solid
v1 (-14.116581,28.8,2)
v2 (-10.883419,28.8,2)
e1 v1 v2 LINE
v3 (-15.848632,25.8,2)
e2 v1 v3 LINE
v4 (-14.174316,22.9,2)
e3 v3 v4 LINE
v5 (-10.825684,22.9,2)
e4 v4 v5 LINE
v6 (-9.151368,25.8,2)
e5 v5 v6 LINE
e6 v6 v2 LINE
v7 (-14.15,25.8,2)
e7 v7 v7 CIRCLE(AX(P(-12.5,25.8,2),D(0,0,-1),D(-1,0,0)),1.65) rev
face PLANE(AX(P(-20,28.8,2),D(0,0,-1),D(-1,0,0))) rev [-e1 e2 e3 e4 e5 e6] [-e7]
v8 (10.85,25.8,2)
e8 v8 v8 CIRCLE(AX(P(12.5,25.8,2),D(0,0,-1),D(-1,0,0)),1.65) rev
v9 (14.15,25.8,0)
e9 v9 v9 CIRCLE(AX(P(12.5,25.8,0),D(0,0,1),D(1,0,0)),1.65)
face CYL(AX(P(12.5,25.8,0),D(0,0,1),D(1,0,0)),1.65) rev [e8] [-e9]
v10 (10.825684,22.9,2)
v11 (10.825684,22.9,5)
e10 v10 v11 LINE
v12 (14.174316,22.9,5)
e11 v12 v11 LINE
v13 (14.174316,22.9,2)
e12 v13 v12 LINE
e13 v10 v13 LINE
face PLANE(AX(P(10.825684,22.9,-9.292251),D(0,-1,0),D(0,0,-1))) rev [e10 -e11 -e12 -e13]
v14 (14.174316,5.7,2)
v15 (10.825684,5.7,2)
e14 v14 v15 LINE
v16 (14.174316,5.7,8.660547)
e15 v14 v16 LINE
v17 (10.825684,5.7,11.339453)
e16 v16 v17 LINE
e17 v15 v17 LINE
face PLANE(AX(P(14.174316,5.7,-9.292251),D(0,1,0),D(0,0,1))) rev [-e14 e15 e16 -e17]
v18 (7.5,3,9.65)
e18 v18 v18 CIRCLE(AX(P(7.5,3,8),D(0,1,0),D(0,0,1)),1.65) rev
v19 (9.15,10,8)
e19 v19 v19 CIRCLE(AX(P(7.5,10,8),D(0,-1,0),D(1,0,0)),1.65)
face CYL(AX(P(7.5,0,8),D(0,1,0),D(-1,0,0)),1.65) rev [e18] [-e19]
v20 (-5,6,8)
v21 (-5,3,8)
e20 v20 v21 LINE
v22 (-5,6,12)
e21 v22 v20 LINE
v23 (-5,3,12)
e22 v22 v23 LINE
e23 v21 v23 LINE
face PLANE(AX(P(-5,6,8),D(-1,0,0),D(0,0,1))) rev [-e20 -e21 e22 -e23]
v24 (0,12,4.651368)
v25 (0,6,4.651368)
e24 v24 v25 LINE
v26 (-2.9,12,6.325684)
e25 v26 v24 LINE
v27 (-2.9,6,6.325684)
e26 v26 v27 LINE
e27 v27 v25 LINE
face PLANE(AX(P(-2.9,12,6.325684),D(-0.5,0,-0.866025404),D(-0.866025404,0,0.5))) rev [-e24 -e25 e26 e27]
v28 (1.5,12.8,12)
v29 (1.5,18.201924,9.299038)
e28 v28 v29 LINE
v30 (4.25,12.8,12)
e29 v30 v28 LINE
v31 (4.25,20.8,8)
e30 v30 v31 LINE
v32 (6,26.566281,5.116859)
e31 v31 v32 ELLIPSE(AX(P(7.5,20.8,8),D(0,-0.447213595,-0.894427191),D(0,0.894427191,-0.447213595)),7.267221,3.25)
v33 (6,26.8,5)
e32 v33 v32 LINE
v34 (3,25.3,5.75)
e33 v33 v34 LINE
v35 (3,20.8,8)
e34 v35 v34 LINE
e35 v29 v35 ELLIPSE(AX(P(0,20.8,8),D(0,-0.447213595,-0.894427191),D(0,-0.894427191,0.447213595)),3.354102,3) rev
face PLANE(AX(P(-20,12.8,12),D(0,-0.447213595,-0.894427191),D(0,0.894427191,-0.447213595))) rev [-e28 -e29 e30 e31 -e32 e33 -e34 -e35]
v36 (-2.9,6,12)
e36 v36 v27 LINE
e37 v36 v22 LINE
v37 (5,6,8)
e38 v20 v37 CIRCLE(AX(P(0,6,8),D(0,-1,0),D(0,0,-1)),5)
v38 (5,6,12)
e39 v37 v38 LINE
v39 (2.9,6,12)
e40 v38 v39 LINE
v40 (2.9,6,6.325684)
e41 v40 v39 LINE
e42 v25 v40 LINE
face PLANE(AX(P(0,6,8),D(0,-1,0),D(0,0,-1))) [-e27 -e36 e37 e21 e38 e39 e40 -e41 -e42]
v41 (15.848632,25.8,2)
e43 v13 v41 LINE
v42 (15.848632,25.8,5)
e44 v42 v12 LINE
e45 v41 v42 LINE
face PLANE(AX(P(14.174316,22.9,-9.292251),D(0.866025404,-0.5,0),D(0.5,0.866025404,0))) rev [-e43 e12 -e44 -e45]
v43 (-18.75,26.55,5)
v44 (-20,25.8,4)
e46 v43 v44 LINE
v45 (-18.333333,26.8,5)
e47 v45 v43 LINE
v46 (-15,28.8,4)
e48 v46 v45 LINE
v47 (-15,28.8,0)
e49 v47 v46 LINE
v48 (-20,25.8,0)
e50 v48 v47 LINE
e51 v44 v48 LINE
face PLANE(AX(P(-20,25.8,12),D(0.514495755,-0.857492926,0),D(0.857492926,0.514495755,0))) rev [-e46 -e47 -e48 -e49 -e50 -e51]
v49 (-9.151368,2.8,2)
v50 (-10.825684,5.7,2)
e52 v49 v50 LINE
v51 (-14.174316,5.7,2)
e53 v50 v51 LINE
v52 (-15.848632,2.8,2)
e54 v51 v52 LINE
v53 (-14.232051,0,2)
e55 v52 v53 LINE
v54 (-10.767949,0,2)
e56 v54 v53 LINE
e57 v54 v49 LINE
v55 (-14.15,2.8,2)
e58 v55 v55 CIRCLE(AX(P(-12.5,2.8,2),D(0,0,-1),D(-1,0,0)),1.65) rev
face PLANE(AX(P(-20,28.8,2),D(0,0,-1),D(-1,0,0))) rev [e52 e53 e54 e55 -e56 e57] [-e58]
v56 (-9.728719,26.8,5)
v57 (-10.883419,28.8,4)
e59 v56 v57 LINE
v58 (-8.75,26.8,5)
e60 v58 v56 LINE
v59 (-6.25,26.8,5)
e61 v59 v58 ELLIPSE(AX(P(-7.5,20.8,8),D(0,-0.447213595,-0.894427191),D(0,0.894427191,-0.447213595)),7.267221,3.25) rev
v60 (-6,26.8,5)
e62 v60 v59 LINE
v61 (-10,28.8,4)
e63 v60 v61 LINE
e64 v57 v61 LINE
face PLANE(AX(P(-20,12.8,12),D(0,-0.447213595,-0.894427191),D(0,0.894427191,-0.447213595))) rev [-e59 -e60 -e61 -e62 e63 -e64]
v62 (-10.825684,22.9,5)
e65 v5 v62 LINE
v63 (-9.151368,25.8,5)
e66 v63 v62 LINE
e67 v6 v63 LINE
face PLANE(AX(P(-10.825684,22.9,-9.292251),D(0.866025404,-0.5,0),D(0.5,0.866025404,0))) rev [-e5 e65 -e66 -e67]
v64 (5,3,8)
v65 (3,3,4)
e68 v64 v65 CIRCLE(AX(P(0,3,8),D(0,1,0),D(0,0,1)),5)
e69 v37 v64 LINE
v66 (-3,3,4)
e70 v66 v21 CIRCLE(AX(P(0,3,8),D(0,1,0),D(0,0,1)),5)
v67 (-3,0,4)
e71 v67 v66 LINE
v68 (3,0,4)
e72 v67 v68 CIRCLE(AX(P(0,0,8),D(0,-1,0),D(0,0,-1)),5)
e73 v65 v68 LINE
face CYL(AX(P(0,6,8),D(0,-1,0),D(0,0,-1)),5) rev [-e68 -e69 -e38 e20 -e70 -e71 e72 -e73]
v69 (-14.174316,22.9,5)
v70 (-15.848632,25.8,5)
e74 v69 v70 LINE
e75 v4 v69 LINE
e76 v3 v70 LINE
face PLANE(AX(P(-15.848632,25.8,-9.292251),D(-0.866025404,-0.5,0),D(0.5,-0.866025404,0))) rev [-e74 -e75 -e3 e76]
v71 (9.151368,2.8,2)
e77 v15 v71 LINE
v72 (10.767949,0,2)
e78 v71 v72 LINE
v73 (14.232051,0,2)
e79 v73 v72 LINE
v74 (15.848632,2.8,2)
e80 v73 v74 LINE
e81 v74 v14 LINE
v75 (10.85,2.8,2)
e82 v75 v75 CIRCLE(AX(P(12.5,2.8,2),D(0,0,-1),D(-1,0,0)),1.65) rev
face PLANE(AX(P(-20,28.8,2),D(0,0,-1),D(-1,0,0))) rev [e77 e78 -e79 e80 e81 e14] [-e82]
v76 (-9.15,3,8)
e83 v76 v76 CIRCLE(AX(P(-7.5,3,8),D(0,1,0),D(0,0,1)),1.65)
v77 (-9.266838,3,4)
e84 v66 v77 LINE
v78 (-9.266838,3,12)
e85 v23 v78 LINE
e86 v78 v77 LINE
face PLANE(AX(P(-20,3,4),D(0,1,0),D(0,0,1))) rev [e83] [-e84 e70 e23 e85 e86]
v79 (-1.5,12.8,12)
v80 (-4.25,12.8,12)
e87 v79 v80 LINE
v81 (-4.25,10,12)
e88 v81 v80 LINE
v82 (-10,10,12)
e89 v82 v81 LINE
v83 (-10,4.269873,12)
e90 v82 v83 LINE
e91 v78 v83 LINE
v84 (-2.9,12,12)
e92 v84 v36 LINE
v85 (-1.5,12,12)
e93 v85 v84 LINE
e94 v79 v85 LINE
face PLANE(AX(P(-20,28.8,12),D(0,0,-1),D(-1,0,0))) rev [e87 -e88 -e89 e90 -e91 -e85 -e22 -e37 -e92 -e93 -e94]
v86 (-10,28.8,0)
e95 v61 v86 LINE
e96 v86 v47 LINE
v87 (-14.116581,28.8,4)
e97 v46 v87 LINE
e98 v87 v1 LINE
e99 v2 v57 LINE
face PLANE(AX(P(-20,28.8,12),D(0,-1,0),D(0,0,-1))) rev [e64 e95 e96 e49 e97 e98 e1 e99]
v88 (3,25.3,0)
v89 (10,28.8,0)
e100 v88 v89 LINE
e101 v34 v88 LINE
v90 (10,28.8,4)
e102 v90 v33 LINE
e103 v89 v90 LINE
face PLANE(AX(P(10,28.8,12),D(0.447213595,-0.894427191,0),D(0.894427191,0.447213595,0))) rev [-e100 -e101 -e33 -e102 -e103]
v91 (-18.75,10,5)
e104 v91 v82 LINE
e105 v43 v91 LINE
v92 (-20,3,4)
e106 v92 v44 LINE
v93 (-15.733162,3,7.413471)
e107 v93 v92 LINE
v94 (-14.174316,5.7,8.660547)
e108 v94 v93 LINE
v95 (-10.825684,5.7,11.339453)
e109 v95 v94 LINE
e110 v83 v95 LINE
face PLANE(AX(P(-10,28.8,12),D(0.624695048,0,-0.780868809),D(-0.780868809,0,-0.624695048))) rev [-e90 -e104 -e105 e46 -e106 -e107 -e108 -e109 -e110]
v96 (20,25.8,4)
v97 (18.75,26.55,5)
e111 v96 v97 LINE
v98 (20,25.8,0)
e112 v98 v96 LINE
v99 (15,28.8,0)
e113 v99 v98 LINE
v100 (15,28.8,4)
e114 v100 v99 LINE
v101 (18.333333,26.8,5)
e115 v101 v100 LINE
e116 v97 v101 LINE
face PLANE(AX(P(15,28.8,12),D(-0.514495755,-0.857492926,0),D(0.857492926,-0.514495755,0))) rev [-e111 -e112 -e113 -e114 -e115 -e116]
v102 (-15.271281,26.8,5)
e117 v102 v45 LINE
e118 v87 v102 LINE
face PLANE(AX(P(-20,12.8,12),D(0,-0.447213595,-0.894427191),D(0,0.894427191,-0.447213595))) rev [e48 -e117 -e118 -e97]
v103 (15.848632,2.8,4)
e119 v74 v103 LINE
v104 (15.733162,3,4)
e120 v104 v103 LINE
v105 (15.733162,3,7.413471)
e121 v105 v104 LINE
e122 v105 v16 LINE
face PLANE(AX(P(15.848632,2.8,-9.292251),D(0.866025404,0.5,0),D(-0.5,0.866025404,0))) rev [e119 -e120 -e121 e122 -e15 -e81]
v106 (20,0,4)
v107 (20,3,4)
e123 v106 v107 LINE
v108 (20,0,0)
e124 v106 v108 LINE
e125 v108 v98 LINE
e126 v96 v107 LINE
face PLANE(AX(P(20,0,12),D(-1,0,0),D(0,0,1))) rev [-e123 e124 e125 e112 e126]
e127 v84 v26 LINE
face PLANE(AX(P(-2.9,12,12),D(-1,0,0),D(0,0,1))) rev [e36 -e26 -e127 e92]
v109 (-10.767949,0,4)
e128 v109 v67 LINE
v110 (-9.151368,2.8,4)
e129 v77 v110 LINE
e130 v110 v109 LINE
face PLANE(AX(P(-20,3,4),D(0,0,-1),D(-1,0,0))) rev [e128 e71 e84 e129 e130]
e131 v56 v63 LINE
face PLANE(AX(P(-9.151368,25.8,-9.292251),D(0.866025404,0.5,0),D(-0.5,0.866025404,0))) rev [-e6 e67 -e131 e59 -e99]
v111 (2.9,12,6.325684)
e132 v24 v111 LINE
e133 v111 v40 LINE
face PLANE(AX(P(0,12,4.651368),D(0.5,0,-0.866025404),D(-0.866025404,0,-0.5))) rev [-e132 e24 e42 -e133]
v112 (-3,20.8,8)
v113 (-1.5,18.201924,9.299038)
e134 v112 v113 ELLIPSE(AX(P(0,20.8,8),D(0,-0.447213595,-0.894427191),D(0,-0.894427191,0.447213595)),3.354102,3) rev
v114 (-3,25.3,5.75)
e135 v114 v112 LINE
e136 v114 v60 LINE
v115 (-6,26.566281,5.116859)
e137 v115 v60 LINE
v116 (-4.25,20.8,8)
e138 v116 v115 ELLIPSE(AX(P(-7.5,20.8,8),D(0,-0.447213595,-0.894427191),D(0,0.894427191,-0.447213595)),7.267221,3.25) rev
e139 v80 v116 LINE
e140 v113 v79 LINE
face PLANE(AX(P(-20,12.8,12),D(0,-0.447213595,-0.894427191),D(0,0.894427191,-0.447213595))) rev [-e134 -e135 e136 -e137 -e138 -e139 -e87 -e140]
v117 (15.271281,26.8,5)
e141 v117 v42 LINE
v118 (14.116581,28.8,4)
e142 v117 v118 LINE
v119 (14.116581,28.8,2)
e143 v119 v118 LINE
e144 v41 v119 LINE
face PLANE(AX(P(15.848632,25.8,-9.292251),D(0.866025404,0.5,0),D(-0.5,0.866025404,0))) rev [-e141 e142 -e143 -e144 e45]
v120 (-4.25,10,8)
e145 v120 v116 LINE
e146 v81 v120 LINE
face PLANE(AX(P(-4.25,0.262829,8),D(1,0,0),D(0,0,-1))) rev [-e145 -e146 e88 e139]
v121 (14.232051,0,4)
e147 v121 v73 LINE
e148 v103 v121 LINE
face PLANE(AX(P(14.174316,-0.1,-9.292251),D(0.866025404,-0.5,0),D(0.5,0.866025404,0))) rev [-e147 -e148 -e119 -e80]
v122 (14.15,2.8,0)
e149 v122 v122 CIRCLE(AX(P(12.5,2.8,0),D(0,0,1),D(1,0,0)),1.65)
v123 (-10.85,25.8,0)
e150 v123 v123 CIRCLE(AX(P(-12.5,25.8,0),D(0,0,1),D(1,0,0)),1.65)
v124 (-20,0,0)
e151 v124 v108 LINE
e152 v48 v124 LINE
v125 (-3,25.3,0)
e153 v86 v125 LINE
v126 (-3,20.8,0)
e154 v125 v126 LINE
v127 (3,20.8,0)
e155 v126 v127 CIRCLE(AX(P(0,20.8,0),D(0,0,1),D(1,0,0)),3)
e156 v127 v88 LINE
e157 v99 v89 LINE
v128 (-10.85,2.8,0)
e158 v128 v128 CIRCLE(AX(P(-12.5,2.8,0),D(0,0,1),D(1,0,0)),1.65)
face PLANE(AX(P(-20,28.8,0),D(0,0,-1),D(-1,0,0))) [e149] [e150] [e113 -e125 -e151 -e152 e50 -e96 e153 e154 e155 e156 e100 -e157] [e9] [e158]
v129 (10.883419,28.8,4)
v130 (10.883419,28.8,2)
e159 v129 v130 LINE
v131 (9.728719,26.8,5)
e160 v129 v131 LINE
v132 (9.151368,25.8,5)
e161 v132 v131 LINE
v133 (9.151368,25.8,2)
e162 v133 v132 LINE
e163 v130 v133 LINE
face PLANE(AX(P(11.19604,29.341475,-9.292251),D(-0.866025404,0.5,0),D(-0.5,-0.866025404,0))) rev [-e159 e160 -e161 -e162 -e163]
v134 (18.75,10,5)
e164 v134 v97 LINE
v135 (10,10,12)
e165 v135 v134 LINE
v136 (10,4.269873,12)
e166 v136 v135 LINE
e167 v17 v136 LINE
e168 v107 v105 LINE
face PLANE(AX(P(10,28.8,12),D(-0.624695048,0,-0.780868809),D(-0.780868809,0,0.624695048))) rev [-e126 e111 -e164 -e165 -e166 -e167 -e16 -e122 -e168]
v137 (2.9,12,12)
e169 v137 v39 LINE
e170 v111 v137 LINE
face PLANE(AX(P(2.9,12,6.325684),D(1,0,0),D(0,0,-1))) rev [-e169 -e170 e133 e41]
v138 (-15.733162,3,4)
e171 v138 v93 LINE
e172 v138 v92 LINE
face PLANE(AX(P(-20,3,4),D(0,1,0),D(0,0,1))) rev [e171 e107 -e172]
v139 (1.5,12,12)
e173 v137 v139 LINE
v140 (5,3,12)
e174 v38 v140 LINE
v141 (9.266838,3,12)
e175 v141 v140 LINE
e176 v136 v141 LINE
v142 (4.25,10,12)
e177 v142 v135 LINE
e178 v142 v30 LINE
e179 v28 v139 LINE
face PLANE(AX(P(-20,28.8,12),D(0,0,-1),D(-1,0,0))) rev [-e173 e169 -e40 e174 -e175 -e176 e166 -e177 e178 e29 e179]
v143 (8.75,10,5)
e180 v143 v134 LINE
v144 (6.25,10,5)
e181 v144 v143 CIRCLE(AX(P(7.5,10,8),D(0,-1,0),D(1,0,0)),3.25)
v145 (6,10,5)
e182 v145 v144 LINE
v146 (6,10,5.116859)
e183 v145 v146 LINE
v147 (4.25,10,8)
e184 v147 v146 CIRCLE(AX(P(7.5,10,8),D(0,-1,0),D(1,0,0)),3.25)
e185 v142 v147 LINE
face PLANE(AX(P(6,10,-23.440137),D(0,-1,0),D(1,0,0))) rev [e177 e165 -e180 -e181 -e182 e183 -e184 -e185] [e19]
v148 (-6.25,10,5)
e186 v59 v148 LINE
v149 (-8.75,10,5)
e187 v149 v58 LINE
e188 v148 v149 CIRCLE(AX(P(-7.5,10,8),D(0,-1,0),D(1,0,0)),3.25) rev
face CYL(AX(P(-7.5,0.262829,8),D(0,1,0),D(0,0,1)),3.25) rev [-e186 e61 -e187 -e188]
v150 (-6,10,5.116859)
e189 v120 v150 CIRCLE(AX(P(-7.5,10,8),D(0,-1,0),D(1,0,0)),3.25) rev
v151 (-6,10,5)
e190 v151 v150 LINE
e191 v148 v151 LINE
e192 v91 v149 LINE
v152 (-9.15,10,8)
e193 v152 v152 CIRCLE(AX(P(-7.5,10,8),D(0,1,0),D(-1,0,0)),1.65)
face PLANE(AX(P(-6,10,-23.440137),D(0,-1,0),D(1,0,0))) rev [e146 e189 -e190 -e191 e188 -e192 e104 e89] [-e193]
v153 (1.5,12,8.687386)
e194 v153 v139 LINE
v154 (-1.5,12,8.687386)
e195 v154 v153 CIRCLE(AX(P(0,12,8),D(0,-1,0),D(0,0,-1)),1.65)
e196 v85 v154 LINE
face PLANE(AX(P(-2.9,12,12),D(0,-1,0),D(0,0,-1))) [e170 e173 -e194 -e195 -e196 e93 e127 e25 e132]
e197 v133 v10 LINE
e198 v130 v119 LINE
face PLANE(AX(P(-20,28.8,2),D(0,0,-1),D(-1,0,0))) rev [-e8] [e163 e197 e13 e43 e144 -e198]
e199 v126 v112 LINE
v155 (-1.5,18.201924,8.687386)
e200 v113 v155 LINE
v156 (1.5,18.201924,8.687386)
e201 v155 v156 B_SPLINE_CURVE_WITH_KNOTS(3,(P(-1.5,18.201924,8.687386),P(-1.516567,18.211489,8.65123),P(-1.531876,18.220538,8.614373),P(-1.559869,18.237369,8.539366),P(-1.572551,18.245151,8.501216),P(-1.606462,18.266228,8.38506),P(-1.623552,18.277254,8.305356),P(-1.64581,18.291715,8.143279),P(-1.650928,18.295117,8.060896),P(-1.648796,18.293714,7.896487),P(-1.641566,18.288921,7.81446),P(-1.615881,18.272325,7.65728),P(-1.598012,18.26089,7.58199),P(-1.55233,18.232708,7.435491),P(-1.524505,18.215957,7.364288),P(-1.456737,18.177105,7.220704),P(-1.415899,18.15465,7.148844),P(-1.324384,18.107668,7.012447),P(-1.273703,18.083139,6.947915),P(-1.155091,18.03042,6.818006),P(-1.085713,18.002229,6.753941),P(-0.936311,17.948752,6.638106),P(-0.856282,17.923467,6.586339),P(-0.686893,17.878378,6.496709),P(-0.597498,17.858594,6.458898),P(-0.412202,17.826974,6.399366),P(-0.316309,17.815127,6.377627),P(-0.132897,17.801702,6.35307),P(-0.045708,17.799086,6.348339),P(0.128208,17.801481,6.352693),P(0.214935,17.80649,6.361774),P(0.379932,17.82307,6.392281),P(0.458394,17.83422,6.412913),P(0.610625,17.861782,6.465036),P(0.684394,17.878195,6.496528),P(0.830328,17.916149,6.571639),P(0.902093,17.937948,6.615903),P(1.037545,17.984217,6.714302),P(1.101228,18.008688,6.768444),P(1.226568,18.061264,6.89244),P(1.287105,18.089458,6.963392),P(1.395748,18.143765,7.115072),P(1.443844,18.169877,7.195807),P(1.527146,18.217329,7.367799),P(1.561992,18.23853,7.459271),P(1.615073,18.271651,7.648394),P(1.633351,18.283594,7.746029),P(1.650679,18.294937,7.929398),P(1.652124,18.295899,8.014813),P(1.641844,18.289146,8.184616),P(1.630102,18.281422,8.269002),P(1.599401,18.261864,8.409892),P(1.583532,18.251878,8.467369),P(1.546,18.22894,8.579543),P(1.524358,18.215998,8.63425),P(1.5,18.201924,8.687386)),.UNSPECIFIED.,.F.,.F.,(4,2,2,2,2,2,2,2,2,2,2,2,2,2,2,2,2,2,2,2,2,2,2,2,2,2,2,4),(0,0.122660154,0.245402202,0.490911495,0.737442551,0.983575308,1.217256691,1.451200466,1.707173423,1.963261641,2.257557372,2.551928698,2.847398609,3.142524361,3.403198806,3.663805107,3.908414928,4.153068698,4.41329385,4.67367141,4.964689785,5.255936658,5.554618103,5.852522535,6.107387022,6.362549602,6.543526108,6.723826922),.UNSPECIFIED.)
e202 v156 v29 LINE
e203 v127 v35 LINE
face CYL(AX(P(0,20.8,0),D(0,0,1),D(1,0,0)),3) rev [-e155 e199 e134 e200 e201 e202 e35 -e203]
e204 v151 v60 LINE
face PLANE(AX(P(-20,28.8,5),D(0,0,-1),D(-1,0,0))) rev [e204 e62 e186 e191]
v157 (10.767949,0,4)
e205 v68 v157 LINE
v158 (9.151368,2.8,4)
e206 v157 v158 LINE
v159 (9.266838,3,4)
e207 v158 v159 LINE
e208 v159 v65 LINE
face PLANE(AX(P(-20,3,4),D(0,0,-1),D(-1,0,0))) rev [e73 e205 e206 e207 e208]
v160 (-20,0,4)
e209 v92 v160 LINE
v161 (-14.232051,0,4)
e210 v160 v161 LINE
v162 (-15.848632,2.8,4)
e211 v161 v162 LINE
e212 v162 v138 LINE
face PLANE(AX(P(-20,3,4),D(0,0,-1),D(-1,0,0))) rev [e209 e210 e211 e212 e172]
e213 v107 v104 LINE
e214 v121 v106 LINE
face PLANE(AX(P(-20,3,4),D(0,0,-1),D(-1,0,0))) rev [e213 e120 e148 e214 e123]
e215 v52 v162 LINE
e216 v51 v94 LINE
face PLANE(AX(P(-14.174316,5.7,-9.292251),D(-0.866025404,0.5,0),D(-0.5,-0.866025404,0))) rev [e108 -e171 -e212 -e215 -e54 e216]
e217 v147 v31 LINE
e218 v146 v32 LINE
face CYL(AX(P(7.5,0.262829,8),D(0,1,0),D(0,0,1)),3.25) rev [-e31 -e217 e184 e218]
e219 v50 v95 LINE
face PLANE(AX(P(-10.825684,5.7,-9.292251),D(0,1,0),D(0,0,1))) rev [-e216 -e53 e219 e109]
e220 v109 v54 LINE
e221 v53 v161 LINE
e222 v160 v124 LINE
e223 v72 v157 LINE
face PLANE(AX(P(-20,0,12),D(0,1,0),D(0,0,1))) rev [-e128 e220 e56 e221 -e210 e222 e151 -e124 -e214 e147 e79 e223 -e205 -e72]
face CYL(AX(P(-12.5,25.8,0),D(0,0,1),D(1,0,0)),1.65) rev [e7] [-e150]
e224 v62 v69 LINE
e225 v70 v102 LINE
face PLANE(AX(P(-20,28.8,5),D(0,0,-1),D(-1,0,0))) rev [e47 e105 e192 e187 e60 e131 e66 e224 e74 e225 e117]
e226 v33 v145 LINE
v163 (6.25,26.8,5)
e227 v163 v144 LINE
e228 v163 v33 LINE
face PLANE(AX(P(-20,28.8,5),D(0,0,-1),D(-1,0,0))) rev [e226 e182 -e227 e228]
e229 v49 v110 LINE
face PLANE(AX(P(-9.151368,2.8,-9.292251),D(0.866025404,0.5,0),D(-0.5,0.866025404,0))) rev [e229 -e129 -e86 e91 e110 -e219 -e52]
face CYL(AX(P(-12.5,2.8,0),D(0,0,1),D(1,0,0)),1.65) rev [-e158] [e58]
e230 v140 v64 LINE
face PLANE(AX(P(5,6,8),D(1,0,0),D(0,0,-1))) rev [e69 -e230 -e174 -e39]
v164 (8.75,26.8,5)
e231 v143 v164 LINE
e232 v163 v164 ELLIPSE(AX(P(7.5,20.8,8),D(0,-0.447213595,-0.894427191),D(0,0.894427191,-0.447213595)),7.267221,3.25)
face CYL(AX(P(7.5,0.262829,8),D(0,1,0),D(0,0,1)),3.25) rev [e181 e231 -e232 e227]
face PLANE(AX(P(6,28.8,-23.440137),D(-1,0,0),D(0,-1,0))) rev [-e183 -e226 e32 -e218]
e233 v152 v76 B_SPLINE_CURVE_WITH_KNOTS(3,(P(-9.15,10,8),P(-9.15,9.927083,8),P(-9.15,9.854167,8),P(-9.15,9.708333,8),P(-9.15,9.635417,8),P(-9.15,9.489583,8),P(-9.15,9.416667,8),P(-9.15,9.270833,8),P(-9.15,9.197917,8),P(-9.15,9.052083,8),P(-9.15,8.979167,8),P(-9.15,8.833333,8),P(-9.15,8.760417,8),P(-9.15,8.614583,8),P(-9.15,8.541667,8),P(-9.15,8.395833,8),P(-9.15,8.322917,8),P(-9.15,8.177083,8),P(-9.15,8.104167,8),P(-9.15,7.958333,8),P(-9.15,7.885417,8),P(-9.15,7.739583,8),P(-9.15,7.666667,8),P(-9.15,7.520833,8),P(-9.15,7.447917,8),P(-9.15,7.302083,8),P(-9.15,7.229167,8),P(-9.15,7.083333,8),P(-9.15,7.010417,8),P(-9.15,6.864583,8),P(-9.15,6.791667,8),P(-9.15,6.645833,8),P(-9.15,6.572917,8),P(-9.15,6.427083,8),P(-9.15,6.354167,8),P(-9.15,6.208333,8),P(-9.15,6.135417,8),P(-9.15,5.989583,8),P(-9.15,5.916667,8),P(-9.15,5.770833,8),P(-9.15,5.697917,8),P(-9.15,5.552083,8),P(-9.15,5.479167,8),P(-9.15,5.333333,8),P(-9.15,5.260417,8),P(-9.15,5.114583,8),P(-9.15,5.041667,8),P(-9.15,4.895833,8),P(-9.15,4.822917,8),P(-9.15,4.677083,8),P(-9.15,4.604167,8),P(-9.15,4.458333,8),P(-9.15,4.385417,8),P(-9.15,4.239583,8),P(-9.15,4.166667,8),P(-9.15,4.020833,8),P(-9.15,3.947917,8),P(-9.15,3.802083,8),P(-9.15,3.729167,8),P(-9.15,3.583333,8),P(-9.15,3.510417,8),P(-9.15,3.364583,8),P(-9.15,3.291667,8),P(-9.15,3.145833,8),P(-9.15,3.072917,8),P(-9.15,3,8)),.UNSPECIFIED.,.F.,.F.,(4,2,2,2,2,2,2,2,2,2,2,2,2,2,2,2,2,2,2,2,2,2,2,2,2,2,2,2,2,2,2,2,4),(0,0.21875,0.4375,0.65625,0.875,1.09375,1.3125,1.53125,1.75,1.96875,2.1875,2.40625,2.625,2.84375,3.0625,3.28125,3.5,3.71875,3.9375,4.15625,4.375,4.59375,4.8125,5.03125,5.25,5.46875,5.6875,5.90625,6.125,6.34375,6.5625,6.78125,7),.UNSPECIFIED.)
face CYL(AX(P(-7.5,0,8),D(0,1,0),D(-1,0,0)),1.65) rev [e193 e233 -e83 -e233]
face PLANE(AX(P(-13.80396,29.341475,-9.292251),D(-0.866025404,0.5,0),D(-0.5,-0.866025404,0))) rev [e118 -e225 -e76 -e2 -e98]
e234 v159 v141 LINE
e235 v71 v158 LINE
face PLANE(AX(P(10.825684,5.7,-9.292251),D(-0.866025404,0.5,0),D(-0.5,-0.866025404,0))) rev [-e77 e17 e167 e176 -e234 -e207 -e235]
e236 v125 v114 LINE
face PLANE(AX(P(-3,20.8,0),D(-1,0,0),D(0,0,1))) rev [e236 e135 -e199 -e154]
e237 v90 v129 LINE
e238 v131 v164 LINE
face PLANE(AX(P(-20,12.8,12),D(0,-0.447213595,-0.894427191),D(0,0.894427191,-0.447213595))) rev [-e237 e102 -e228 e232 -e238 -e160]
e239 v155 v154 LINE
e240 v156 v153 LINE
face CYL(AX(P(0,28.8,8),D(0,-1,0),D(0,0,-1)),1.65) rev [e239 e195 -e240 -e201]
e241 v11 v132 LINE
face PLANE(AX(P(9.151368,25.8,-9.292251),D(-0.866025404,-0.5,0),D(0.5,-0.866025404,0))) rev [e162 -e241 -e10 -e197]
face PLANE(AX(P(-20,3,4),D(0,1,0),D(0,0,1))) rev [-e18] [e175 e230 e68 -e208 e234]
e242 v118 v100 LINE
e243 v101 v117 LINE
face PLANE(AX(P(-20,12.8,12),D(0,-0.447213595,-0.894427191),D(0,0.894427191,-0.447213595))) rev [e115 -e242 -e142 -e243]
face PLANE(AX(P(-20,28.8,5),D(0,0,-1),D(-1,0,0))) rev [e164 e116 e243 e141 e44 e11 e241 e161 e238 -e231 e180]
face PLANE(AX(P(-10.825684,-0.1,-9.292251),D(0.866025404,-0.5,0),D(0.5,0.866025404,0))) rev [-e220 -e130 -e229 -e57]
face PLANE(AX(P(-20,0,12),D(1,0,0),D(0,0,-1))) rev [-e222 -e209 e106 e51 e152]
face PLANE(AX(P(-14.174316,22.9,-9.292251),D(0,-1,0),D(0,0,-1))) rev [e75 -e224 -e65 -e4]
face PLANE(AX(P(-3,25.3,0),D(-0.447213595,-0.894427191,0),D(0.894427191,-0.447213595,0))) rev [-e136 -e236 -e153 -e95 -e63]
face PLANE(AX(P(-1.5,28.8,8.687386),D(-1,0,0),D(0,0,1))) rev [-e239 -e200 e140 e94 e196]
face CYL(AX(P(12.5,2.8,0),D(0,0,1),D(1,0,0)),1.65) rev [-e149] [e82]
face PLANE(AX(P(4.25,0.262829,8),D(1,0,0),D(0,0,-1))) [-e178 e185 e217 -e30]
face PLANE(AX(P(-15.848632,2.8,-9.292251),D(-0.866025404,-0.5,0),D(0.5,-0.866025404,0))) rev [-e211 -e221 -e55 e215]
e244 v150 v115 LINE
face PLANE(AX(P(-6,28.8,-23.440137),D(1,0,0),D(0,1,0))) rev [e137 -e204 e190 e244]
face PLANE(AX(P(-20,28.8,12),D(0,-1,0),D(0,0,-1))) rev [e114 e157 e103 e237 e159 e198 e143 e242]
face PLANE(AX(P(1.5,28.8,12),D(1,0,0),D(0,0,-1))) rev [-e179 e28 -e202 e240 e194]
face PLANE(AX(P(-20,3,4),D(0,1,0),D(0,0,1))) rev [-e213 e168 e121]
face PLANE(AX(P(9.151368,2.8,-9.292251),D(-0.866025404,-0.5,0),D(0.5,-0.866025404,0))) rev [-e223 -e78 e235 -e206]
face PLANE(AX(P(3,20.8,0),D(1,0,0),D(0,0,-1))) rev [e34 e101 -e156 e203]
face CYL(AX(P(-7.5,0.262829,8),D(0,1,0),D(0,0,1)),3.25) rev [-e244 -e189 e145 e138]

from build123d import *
from OCP.BRepFilletAPI import BRepFilletAPI_MakeChamfer

# Parameters (mm, degrees)
SKETCH1_W           = 40
SKETCH1_H           = 28.8
BOSS_EXTRUDE1_DEPTH = 12
CHAMFER2_SIZE       = 8
CHAMFER2_SIZE2      = 16
SKETCH10_W          = 14
SKETCH10_H          = 18.8
CUT_EXTRUDE7_DEPTH  = 7
SKETCH11_W          = 40
SKETCH11_H          = 3
CUT_EXTRUDE8_DEPTH  = 8
CHAMFER3_SIZE       = 8
CHAMFER3_SIZE2      = 10
CUT_EXTRUDE9_REACH  = 39.06
SKETCH13_R          = 1.65
CUT_EXTRUDE10_DEPTH = 30.957302949
CUT_EXTRUDE2_DEPTH  = 6
CUT_EXTRUDE3_DEPTH  = 38.05995143
SKETCH2_R           = 1.65
CUT_EXTRUDE1_DEPTH  = 38.05995143
CUT_EXTRUDE4_DEPTH  = 10
CUT_EXTRUDE5_DEPTH  = 6
CUT_EXTRUDE6_DEPTH  = 29.744390757
CHAMFER4_SIZE       = 3
CHAMFER4_SIZE_2     = 5
CHAMFER5_SIZE       = 3
CHAMFER5_SIZE_2     = 5
CHAMFER6_SIZE2      = 7
CHAMFER6_SIZE       = 3.5
CHAMFER7_SIZE2      = 7
CHAMFER7_SIZE       = 3.5


# Some blends are built 0.0001 mm under size
with BuildPart() as part:
    # Sketch1 → Boss-Extrude1 (new body)
    with BuildSketch(Plane.XY):
        with Locations((0, 14.4)):
            Rectangle(SKETCH1_W, SKETCH1_H)
    extrude(amount=BOSS_EXTRUDE1_DEPTH)

    # Chamfer2
    chamfer2_edges = [part.edges().sort_by_distance(p)[0] for p in [
        (0, 28.8, 12),
    ]]
    chamfer2_side = [part.faces().sort_by_distance(p)[0] for p in [
        (0, 28.8, 6),
    ]]
    chamfer(chamfer2_edges, length=CHAMFER2_SIZE, length2=CHAMFER2_SIZE2, reference=chamfer2_side[0])

    # Sketch10 → Cut-Extrude7 (cut)
    with BuildSketch(Plane.XY.offset(12)):
        with Locations((-13, 19.4)):
            Rectangle(SKETCH10_W, SKETCH10_H)
        with Locations((13, 19.4)):
            Rectangle(SKETCH10_W, SKETCH10_H)
    extrude(amount=-CUT_EXTRUDE7_DEPTH, mode=Mode.SUBTRACT)

    # Sketch11 → Cut-Extrude8 (cut)
    with BuildSketch(Plane.XY.offset(12)):
        with Locations((0, 1.5)):
            Rectangle(SKETCH11_W, SKETCH11_H)
    extrude(amount=-CUT_EXTRUDE8_DEPTH, mode=Mode.SUBTRACT)

    # Chamfer3: one chamfer whose edges measure the first distance from different faces: ONE call of the kernel's chamfer builder (chamfer() names one face for all edges)
    chamfer3_edges_1 = [part.edges().sort_by_distance(p)[0] for p in [
        (-20, 6.5, 12),
    ]]
    chamfer3_side_1 = [part.faces().sort_by_distance(p)[0] for p in [
        (-20, 12.483950617, 4.012345679),
    ]]
    chamfer3_edges_2 = [part.edges().sort_by_distance(p)[0] for p in [
        (20, 6.5, 12),
    ]]
    chamfer3_side_2 = [part.faces().sort_by_distance(p)[0] for p in [
        (20, 12.483950617, 4.012345679),
    ]]
    chamfer3 = BRepFilletAPI_MakeChamfer(part.part.solid().wrapped)
    for e in chamfer3_edges_1:
        chamfer3.Add(CHAMFER3_SIZE, CHAMFER3_SIZE2, e.wrapped, chamfer3_side_1[0].wrapped)  # the first distance lies on this face
    for e in chamfer3_edges_2:
        chamfer3.Add(CHAMFER3_SIZE, CHAMFER3_SIZE2, e.wrapped, chamfer3_side_2[0].wrapped)  # the first distance lies on this face
    add(Compound.cast(chamfer3.Shape()), mode=Mode.REPLACE)

    # Cut-Extrude9: up to this face of the body (flat: up to its plane)
    cut_extrude9_end = Plane(part.part.faces().sort_by_distance((-10.56840796, 10, 7.890547264))[0])
    # Sketch12 → Cut-Extrude9 (cut, up to the picked face)
    with BuildSketch(Plane(origin=(0, 28.8, 0), x_dir=(1, 0, 0), z_dir=(0, 1, 0)), mode=Mode.PRIVATE) as cut_extrude9_sk1:
        with BuildLine():
            Line((-4.25, -8), (-4.25, -12))
            Line((-4.25, -12), (-10.75, -12))
            Line((-10.75, -12), (-10.75, -8))
            ThreePointArc((-10.75, -8), (-7.5, -4.75), (-4.25, -8))
        make_face()
    cut_extrude9_tool1 = split(extrude(cut_extrude9_sk1.sketch, amount=-CUT_EXTRUDE9_REACH, mode=Mode.PRIVATE), bisect_by=cut_extrude9_end, keep=Keep.BOTH, mode=Mode.PRIVATE)
    cut_extrude9 = cut_extrude9_tool1.solids().sort_by(Axis((-7.5, 28.8, 8.683577), (0, -1, 0)))[0]
    add(cut_extrude9, mode=Mode.SUBTRACT)

    # Sketch13 → Cut-Extrude10 (cut, through all)
    with BuildSketch(Plane(origin=(0, 10, 0), x_dir=(1, 0, 0), z_dir=(0, 1, 0))):
        with Locations(Location((-7.5, -8, 0), (0, 0, 180))):
            Circle(SKETCH13_R)
    cut_extrude10 = extrude(amount=-CUT_EXTRUDE10_DEPTH, mode=Mode.SUBTRACT)

    # Sketch3 → Cut-Extrude2 (cut)
    with BuildSketch(Plane.XZ):
        with BuildLine():
            Line((-5, 8), (-5, 12))
            Line((-5, 12), (5, 12))
            Line((5, 12), (5, 8))
            ThreePointArc((5, 8), (0, 3), (-5, 8))
        make_face()
    extrude(amount=-CUT_EXTRUDE2_DEPTH, mode=Mode.SUBTRACT)

    # Sketch4 → Cut-Extrude3 (cut, through all)
    with BuildSketch(Plane.XY.offset(12)):
        with BuildLine():
            Line((-3, 20.8), (-3, 28.8))
            Line((-3, 28.8), (3, 28.8))
            Line((3, 28.8), (3, 20.8))
            ThreePointArc((3, 20.8), (0, 17.8), (-3, 20.8))
        make_face()
    extrude(amount=-CUT_EXTRUDE3_DEPTH, mode=Mode.SUBTRACT)

    # Sketch2 → Cut-Extrude1 (cut, through all)
    with BuildSketch(Plane.XY.offset(12)):
        with Locations((-12.5, 2.8)):
            Circle(SKETCH2_R)
        with Locations((12.5, 2.8)):
            Circle(SKETCH2_R)
        with Locations((12.5, 25.8)):
            Circle(SKETCH2_R)
        with Locations((-12.5, 25.8)):
            Circle(SKETCH2_R)
    extrude(amount=-CUT_EXTRUDE1_DEPTH, mode=Mode.SUBTRACT)

    # Sketch5 → Cut-Extrude4 (cut)
    with BuildSketch(Plane.XY.offset(12)):
        Polygon((-13.803959833, 29.341475319), (-11.196040167, 29.341475319), (-9.151368439, 25.8), (-10.825684219, 22.9), (-14.174315781, 22.9), (-15.848631561, 25.8), align=None)
        Polygon((11.196040167, 29.341475319), (13.803959833, 29.341475319), (15.848631561, 25.8), (14.174315781, 22.9), (10.825684219, 22.9), (9.151368439, 25.8), align=None)
        Polygon((-9.151368439, 2.8), (-10.825684219, 5.7), (-14.174315781, 5.7), (-15.848631561, 2.8), (-14.174315781, -0.1), (-10.825684219, -0.1), align=None)
        Polygon((15.848631561, 2.8), (14.174315781, 5.7), (10.825684219, 5.7), (9.151368439, 2.8), (10.825684219, -0.1), (14.174315781, -0.1), align=None)
    extrude(amount=-CUT_EXTRUDE4_DEPTH, mode=Mode.SUBTRACT)

    # Sketch6 → Cut-Extrude5 (cut)
    with BuildSketch(Plane.XZ.offset(-6)):
        Polygon((-2.9, 12), (2.9, 12), (2.9, 6.325684219), (0, 4.651368439), (-2.9, 6.325684219), align=None)
    extrude(amount=-CUT_EXTRUDE5_DEPTH, mode=Mode.SUBTRACT)

    # Sketch7 → Cut-Extrude6 (cut, through all)
    with BuildSketch(Plane.XZ.offset(-12)):
        with BuildLine():
            Line((-1.5, 8.687386354), (-1.5, 12))
            Line((-1.5, 12), (1.5, 12))
            Line((1.5, 12), (1.5, 8.687386354))
            ThreePointArc((1.5, 8.687386354), (0, 6.35), (-1.5, 8.687386354))
        make_face()
    extrude(amount=-CUT_EXTRUDE6_DEPTH, mode=Mode.SUBTRACT)

    # Mirror1: Cut-Extrude9, Cut-Extrude10 across plane
    add(cut_extrude9.mirror(Plane(origin=(0, 0, 0), x_dir=(0, 0, 1), z_dir=(1, 0, 0))), mode=Mode.SUBTRACT)
    add(cut_extrude10.mirror(Plane(origin=(0, 0, 0), x_dir=(0, 0, 1), z_dir=(1, 0, 0))), mode=Mode.SUBTRACT)

    # Chamfer4
    # the kernel refuses this chamfer: 5, 3 mm, written as the material it takes off along each edge
    with BuildSketch(Plane(origin=(20, 28.8, -12.931305486), x_dir=(0.05518620705976579, -0.9984760801092616, 0), z_dir=(0, 0, 1))) as chamfer4_piece_1:
        Polygon((CHAMFER4_SIZE * 0.998476080109, -CHAMFER4_SIZE * 0.0551862070598), (-CHAMFER4_SIZE_2 * 0.0551862070598, -CHAMFER4_SIZE_2 * 0.998476080109), (0, 0), align=None)
    extrude(amount=29.862610972, mode=Mode.SUBTRACT)

    # Chamfer5
    # the kernel refuses this chamfer: 5, 3 mm, written as the material it takes off along each edge
    with BuildSketch(Plane(origin=(-20, 28.8, -12.931305486), x_dir=(-0.05518620705976579, -0.9984760801092616, 0), z_dir=(0, 0, 1))) as chamfer5_piece_1:
        Polygon((CHAMFER5_SIZE * 0.998476080109, CHAMFER5_SIZE * 0.0551862070598), (-CHAMFER5_SIZE_2 * 0.0551862070598, CHAMFER5_SIZE_2 * 0.998476080109), (0, 0), align=None)
    extrude(amount=29.862610972, mode=Mode.SUBTRACT)

    # Chamfer6
    chamfer6_edges = [part.edges().sort_by_distance(p)[0] for p in [
        (-3, 28.8, 2),
    ]]
    chamfer6_side = [part.faces().sort_by_distance(p)[0] for p in [
        (-3, 28.73, 2),
    ]]
    chamfer(chamfer6_edges, length=CHAMFER6_SIZE - 0.0001, length2=CHAMFER6_SIZE2 - 0.0001, reference=chamfer6_side[0])  # a hair under: the kernel refuses the full size

    # Chamfer7
    chamfer7_edges = [part.edges().sort_by_distance(p)[0] for p in [
        (3, 28.8, 2),
    ]]
    chamfer7_side = [part.faces().sort_by_distance(p)[0] for p in [
        (3, 28.73, 2),
    ]]
    chamfer(chamfer7_edges, length=CHAMFER7_SIZE - 0.0001, length2=CHAMFER7_SIZE2 - 0.0001, reference=chamfer7_side[0])  # a hair under: the kernel refuses the full size


solid = part.part
